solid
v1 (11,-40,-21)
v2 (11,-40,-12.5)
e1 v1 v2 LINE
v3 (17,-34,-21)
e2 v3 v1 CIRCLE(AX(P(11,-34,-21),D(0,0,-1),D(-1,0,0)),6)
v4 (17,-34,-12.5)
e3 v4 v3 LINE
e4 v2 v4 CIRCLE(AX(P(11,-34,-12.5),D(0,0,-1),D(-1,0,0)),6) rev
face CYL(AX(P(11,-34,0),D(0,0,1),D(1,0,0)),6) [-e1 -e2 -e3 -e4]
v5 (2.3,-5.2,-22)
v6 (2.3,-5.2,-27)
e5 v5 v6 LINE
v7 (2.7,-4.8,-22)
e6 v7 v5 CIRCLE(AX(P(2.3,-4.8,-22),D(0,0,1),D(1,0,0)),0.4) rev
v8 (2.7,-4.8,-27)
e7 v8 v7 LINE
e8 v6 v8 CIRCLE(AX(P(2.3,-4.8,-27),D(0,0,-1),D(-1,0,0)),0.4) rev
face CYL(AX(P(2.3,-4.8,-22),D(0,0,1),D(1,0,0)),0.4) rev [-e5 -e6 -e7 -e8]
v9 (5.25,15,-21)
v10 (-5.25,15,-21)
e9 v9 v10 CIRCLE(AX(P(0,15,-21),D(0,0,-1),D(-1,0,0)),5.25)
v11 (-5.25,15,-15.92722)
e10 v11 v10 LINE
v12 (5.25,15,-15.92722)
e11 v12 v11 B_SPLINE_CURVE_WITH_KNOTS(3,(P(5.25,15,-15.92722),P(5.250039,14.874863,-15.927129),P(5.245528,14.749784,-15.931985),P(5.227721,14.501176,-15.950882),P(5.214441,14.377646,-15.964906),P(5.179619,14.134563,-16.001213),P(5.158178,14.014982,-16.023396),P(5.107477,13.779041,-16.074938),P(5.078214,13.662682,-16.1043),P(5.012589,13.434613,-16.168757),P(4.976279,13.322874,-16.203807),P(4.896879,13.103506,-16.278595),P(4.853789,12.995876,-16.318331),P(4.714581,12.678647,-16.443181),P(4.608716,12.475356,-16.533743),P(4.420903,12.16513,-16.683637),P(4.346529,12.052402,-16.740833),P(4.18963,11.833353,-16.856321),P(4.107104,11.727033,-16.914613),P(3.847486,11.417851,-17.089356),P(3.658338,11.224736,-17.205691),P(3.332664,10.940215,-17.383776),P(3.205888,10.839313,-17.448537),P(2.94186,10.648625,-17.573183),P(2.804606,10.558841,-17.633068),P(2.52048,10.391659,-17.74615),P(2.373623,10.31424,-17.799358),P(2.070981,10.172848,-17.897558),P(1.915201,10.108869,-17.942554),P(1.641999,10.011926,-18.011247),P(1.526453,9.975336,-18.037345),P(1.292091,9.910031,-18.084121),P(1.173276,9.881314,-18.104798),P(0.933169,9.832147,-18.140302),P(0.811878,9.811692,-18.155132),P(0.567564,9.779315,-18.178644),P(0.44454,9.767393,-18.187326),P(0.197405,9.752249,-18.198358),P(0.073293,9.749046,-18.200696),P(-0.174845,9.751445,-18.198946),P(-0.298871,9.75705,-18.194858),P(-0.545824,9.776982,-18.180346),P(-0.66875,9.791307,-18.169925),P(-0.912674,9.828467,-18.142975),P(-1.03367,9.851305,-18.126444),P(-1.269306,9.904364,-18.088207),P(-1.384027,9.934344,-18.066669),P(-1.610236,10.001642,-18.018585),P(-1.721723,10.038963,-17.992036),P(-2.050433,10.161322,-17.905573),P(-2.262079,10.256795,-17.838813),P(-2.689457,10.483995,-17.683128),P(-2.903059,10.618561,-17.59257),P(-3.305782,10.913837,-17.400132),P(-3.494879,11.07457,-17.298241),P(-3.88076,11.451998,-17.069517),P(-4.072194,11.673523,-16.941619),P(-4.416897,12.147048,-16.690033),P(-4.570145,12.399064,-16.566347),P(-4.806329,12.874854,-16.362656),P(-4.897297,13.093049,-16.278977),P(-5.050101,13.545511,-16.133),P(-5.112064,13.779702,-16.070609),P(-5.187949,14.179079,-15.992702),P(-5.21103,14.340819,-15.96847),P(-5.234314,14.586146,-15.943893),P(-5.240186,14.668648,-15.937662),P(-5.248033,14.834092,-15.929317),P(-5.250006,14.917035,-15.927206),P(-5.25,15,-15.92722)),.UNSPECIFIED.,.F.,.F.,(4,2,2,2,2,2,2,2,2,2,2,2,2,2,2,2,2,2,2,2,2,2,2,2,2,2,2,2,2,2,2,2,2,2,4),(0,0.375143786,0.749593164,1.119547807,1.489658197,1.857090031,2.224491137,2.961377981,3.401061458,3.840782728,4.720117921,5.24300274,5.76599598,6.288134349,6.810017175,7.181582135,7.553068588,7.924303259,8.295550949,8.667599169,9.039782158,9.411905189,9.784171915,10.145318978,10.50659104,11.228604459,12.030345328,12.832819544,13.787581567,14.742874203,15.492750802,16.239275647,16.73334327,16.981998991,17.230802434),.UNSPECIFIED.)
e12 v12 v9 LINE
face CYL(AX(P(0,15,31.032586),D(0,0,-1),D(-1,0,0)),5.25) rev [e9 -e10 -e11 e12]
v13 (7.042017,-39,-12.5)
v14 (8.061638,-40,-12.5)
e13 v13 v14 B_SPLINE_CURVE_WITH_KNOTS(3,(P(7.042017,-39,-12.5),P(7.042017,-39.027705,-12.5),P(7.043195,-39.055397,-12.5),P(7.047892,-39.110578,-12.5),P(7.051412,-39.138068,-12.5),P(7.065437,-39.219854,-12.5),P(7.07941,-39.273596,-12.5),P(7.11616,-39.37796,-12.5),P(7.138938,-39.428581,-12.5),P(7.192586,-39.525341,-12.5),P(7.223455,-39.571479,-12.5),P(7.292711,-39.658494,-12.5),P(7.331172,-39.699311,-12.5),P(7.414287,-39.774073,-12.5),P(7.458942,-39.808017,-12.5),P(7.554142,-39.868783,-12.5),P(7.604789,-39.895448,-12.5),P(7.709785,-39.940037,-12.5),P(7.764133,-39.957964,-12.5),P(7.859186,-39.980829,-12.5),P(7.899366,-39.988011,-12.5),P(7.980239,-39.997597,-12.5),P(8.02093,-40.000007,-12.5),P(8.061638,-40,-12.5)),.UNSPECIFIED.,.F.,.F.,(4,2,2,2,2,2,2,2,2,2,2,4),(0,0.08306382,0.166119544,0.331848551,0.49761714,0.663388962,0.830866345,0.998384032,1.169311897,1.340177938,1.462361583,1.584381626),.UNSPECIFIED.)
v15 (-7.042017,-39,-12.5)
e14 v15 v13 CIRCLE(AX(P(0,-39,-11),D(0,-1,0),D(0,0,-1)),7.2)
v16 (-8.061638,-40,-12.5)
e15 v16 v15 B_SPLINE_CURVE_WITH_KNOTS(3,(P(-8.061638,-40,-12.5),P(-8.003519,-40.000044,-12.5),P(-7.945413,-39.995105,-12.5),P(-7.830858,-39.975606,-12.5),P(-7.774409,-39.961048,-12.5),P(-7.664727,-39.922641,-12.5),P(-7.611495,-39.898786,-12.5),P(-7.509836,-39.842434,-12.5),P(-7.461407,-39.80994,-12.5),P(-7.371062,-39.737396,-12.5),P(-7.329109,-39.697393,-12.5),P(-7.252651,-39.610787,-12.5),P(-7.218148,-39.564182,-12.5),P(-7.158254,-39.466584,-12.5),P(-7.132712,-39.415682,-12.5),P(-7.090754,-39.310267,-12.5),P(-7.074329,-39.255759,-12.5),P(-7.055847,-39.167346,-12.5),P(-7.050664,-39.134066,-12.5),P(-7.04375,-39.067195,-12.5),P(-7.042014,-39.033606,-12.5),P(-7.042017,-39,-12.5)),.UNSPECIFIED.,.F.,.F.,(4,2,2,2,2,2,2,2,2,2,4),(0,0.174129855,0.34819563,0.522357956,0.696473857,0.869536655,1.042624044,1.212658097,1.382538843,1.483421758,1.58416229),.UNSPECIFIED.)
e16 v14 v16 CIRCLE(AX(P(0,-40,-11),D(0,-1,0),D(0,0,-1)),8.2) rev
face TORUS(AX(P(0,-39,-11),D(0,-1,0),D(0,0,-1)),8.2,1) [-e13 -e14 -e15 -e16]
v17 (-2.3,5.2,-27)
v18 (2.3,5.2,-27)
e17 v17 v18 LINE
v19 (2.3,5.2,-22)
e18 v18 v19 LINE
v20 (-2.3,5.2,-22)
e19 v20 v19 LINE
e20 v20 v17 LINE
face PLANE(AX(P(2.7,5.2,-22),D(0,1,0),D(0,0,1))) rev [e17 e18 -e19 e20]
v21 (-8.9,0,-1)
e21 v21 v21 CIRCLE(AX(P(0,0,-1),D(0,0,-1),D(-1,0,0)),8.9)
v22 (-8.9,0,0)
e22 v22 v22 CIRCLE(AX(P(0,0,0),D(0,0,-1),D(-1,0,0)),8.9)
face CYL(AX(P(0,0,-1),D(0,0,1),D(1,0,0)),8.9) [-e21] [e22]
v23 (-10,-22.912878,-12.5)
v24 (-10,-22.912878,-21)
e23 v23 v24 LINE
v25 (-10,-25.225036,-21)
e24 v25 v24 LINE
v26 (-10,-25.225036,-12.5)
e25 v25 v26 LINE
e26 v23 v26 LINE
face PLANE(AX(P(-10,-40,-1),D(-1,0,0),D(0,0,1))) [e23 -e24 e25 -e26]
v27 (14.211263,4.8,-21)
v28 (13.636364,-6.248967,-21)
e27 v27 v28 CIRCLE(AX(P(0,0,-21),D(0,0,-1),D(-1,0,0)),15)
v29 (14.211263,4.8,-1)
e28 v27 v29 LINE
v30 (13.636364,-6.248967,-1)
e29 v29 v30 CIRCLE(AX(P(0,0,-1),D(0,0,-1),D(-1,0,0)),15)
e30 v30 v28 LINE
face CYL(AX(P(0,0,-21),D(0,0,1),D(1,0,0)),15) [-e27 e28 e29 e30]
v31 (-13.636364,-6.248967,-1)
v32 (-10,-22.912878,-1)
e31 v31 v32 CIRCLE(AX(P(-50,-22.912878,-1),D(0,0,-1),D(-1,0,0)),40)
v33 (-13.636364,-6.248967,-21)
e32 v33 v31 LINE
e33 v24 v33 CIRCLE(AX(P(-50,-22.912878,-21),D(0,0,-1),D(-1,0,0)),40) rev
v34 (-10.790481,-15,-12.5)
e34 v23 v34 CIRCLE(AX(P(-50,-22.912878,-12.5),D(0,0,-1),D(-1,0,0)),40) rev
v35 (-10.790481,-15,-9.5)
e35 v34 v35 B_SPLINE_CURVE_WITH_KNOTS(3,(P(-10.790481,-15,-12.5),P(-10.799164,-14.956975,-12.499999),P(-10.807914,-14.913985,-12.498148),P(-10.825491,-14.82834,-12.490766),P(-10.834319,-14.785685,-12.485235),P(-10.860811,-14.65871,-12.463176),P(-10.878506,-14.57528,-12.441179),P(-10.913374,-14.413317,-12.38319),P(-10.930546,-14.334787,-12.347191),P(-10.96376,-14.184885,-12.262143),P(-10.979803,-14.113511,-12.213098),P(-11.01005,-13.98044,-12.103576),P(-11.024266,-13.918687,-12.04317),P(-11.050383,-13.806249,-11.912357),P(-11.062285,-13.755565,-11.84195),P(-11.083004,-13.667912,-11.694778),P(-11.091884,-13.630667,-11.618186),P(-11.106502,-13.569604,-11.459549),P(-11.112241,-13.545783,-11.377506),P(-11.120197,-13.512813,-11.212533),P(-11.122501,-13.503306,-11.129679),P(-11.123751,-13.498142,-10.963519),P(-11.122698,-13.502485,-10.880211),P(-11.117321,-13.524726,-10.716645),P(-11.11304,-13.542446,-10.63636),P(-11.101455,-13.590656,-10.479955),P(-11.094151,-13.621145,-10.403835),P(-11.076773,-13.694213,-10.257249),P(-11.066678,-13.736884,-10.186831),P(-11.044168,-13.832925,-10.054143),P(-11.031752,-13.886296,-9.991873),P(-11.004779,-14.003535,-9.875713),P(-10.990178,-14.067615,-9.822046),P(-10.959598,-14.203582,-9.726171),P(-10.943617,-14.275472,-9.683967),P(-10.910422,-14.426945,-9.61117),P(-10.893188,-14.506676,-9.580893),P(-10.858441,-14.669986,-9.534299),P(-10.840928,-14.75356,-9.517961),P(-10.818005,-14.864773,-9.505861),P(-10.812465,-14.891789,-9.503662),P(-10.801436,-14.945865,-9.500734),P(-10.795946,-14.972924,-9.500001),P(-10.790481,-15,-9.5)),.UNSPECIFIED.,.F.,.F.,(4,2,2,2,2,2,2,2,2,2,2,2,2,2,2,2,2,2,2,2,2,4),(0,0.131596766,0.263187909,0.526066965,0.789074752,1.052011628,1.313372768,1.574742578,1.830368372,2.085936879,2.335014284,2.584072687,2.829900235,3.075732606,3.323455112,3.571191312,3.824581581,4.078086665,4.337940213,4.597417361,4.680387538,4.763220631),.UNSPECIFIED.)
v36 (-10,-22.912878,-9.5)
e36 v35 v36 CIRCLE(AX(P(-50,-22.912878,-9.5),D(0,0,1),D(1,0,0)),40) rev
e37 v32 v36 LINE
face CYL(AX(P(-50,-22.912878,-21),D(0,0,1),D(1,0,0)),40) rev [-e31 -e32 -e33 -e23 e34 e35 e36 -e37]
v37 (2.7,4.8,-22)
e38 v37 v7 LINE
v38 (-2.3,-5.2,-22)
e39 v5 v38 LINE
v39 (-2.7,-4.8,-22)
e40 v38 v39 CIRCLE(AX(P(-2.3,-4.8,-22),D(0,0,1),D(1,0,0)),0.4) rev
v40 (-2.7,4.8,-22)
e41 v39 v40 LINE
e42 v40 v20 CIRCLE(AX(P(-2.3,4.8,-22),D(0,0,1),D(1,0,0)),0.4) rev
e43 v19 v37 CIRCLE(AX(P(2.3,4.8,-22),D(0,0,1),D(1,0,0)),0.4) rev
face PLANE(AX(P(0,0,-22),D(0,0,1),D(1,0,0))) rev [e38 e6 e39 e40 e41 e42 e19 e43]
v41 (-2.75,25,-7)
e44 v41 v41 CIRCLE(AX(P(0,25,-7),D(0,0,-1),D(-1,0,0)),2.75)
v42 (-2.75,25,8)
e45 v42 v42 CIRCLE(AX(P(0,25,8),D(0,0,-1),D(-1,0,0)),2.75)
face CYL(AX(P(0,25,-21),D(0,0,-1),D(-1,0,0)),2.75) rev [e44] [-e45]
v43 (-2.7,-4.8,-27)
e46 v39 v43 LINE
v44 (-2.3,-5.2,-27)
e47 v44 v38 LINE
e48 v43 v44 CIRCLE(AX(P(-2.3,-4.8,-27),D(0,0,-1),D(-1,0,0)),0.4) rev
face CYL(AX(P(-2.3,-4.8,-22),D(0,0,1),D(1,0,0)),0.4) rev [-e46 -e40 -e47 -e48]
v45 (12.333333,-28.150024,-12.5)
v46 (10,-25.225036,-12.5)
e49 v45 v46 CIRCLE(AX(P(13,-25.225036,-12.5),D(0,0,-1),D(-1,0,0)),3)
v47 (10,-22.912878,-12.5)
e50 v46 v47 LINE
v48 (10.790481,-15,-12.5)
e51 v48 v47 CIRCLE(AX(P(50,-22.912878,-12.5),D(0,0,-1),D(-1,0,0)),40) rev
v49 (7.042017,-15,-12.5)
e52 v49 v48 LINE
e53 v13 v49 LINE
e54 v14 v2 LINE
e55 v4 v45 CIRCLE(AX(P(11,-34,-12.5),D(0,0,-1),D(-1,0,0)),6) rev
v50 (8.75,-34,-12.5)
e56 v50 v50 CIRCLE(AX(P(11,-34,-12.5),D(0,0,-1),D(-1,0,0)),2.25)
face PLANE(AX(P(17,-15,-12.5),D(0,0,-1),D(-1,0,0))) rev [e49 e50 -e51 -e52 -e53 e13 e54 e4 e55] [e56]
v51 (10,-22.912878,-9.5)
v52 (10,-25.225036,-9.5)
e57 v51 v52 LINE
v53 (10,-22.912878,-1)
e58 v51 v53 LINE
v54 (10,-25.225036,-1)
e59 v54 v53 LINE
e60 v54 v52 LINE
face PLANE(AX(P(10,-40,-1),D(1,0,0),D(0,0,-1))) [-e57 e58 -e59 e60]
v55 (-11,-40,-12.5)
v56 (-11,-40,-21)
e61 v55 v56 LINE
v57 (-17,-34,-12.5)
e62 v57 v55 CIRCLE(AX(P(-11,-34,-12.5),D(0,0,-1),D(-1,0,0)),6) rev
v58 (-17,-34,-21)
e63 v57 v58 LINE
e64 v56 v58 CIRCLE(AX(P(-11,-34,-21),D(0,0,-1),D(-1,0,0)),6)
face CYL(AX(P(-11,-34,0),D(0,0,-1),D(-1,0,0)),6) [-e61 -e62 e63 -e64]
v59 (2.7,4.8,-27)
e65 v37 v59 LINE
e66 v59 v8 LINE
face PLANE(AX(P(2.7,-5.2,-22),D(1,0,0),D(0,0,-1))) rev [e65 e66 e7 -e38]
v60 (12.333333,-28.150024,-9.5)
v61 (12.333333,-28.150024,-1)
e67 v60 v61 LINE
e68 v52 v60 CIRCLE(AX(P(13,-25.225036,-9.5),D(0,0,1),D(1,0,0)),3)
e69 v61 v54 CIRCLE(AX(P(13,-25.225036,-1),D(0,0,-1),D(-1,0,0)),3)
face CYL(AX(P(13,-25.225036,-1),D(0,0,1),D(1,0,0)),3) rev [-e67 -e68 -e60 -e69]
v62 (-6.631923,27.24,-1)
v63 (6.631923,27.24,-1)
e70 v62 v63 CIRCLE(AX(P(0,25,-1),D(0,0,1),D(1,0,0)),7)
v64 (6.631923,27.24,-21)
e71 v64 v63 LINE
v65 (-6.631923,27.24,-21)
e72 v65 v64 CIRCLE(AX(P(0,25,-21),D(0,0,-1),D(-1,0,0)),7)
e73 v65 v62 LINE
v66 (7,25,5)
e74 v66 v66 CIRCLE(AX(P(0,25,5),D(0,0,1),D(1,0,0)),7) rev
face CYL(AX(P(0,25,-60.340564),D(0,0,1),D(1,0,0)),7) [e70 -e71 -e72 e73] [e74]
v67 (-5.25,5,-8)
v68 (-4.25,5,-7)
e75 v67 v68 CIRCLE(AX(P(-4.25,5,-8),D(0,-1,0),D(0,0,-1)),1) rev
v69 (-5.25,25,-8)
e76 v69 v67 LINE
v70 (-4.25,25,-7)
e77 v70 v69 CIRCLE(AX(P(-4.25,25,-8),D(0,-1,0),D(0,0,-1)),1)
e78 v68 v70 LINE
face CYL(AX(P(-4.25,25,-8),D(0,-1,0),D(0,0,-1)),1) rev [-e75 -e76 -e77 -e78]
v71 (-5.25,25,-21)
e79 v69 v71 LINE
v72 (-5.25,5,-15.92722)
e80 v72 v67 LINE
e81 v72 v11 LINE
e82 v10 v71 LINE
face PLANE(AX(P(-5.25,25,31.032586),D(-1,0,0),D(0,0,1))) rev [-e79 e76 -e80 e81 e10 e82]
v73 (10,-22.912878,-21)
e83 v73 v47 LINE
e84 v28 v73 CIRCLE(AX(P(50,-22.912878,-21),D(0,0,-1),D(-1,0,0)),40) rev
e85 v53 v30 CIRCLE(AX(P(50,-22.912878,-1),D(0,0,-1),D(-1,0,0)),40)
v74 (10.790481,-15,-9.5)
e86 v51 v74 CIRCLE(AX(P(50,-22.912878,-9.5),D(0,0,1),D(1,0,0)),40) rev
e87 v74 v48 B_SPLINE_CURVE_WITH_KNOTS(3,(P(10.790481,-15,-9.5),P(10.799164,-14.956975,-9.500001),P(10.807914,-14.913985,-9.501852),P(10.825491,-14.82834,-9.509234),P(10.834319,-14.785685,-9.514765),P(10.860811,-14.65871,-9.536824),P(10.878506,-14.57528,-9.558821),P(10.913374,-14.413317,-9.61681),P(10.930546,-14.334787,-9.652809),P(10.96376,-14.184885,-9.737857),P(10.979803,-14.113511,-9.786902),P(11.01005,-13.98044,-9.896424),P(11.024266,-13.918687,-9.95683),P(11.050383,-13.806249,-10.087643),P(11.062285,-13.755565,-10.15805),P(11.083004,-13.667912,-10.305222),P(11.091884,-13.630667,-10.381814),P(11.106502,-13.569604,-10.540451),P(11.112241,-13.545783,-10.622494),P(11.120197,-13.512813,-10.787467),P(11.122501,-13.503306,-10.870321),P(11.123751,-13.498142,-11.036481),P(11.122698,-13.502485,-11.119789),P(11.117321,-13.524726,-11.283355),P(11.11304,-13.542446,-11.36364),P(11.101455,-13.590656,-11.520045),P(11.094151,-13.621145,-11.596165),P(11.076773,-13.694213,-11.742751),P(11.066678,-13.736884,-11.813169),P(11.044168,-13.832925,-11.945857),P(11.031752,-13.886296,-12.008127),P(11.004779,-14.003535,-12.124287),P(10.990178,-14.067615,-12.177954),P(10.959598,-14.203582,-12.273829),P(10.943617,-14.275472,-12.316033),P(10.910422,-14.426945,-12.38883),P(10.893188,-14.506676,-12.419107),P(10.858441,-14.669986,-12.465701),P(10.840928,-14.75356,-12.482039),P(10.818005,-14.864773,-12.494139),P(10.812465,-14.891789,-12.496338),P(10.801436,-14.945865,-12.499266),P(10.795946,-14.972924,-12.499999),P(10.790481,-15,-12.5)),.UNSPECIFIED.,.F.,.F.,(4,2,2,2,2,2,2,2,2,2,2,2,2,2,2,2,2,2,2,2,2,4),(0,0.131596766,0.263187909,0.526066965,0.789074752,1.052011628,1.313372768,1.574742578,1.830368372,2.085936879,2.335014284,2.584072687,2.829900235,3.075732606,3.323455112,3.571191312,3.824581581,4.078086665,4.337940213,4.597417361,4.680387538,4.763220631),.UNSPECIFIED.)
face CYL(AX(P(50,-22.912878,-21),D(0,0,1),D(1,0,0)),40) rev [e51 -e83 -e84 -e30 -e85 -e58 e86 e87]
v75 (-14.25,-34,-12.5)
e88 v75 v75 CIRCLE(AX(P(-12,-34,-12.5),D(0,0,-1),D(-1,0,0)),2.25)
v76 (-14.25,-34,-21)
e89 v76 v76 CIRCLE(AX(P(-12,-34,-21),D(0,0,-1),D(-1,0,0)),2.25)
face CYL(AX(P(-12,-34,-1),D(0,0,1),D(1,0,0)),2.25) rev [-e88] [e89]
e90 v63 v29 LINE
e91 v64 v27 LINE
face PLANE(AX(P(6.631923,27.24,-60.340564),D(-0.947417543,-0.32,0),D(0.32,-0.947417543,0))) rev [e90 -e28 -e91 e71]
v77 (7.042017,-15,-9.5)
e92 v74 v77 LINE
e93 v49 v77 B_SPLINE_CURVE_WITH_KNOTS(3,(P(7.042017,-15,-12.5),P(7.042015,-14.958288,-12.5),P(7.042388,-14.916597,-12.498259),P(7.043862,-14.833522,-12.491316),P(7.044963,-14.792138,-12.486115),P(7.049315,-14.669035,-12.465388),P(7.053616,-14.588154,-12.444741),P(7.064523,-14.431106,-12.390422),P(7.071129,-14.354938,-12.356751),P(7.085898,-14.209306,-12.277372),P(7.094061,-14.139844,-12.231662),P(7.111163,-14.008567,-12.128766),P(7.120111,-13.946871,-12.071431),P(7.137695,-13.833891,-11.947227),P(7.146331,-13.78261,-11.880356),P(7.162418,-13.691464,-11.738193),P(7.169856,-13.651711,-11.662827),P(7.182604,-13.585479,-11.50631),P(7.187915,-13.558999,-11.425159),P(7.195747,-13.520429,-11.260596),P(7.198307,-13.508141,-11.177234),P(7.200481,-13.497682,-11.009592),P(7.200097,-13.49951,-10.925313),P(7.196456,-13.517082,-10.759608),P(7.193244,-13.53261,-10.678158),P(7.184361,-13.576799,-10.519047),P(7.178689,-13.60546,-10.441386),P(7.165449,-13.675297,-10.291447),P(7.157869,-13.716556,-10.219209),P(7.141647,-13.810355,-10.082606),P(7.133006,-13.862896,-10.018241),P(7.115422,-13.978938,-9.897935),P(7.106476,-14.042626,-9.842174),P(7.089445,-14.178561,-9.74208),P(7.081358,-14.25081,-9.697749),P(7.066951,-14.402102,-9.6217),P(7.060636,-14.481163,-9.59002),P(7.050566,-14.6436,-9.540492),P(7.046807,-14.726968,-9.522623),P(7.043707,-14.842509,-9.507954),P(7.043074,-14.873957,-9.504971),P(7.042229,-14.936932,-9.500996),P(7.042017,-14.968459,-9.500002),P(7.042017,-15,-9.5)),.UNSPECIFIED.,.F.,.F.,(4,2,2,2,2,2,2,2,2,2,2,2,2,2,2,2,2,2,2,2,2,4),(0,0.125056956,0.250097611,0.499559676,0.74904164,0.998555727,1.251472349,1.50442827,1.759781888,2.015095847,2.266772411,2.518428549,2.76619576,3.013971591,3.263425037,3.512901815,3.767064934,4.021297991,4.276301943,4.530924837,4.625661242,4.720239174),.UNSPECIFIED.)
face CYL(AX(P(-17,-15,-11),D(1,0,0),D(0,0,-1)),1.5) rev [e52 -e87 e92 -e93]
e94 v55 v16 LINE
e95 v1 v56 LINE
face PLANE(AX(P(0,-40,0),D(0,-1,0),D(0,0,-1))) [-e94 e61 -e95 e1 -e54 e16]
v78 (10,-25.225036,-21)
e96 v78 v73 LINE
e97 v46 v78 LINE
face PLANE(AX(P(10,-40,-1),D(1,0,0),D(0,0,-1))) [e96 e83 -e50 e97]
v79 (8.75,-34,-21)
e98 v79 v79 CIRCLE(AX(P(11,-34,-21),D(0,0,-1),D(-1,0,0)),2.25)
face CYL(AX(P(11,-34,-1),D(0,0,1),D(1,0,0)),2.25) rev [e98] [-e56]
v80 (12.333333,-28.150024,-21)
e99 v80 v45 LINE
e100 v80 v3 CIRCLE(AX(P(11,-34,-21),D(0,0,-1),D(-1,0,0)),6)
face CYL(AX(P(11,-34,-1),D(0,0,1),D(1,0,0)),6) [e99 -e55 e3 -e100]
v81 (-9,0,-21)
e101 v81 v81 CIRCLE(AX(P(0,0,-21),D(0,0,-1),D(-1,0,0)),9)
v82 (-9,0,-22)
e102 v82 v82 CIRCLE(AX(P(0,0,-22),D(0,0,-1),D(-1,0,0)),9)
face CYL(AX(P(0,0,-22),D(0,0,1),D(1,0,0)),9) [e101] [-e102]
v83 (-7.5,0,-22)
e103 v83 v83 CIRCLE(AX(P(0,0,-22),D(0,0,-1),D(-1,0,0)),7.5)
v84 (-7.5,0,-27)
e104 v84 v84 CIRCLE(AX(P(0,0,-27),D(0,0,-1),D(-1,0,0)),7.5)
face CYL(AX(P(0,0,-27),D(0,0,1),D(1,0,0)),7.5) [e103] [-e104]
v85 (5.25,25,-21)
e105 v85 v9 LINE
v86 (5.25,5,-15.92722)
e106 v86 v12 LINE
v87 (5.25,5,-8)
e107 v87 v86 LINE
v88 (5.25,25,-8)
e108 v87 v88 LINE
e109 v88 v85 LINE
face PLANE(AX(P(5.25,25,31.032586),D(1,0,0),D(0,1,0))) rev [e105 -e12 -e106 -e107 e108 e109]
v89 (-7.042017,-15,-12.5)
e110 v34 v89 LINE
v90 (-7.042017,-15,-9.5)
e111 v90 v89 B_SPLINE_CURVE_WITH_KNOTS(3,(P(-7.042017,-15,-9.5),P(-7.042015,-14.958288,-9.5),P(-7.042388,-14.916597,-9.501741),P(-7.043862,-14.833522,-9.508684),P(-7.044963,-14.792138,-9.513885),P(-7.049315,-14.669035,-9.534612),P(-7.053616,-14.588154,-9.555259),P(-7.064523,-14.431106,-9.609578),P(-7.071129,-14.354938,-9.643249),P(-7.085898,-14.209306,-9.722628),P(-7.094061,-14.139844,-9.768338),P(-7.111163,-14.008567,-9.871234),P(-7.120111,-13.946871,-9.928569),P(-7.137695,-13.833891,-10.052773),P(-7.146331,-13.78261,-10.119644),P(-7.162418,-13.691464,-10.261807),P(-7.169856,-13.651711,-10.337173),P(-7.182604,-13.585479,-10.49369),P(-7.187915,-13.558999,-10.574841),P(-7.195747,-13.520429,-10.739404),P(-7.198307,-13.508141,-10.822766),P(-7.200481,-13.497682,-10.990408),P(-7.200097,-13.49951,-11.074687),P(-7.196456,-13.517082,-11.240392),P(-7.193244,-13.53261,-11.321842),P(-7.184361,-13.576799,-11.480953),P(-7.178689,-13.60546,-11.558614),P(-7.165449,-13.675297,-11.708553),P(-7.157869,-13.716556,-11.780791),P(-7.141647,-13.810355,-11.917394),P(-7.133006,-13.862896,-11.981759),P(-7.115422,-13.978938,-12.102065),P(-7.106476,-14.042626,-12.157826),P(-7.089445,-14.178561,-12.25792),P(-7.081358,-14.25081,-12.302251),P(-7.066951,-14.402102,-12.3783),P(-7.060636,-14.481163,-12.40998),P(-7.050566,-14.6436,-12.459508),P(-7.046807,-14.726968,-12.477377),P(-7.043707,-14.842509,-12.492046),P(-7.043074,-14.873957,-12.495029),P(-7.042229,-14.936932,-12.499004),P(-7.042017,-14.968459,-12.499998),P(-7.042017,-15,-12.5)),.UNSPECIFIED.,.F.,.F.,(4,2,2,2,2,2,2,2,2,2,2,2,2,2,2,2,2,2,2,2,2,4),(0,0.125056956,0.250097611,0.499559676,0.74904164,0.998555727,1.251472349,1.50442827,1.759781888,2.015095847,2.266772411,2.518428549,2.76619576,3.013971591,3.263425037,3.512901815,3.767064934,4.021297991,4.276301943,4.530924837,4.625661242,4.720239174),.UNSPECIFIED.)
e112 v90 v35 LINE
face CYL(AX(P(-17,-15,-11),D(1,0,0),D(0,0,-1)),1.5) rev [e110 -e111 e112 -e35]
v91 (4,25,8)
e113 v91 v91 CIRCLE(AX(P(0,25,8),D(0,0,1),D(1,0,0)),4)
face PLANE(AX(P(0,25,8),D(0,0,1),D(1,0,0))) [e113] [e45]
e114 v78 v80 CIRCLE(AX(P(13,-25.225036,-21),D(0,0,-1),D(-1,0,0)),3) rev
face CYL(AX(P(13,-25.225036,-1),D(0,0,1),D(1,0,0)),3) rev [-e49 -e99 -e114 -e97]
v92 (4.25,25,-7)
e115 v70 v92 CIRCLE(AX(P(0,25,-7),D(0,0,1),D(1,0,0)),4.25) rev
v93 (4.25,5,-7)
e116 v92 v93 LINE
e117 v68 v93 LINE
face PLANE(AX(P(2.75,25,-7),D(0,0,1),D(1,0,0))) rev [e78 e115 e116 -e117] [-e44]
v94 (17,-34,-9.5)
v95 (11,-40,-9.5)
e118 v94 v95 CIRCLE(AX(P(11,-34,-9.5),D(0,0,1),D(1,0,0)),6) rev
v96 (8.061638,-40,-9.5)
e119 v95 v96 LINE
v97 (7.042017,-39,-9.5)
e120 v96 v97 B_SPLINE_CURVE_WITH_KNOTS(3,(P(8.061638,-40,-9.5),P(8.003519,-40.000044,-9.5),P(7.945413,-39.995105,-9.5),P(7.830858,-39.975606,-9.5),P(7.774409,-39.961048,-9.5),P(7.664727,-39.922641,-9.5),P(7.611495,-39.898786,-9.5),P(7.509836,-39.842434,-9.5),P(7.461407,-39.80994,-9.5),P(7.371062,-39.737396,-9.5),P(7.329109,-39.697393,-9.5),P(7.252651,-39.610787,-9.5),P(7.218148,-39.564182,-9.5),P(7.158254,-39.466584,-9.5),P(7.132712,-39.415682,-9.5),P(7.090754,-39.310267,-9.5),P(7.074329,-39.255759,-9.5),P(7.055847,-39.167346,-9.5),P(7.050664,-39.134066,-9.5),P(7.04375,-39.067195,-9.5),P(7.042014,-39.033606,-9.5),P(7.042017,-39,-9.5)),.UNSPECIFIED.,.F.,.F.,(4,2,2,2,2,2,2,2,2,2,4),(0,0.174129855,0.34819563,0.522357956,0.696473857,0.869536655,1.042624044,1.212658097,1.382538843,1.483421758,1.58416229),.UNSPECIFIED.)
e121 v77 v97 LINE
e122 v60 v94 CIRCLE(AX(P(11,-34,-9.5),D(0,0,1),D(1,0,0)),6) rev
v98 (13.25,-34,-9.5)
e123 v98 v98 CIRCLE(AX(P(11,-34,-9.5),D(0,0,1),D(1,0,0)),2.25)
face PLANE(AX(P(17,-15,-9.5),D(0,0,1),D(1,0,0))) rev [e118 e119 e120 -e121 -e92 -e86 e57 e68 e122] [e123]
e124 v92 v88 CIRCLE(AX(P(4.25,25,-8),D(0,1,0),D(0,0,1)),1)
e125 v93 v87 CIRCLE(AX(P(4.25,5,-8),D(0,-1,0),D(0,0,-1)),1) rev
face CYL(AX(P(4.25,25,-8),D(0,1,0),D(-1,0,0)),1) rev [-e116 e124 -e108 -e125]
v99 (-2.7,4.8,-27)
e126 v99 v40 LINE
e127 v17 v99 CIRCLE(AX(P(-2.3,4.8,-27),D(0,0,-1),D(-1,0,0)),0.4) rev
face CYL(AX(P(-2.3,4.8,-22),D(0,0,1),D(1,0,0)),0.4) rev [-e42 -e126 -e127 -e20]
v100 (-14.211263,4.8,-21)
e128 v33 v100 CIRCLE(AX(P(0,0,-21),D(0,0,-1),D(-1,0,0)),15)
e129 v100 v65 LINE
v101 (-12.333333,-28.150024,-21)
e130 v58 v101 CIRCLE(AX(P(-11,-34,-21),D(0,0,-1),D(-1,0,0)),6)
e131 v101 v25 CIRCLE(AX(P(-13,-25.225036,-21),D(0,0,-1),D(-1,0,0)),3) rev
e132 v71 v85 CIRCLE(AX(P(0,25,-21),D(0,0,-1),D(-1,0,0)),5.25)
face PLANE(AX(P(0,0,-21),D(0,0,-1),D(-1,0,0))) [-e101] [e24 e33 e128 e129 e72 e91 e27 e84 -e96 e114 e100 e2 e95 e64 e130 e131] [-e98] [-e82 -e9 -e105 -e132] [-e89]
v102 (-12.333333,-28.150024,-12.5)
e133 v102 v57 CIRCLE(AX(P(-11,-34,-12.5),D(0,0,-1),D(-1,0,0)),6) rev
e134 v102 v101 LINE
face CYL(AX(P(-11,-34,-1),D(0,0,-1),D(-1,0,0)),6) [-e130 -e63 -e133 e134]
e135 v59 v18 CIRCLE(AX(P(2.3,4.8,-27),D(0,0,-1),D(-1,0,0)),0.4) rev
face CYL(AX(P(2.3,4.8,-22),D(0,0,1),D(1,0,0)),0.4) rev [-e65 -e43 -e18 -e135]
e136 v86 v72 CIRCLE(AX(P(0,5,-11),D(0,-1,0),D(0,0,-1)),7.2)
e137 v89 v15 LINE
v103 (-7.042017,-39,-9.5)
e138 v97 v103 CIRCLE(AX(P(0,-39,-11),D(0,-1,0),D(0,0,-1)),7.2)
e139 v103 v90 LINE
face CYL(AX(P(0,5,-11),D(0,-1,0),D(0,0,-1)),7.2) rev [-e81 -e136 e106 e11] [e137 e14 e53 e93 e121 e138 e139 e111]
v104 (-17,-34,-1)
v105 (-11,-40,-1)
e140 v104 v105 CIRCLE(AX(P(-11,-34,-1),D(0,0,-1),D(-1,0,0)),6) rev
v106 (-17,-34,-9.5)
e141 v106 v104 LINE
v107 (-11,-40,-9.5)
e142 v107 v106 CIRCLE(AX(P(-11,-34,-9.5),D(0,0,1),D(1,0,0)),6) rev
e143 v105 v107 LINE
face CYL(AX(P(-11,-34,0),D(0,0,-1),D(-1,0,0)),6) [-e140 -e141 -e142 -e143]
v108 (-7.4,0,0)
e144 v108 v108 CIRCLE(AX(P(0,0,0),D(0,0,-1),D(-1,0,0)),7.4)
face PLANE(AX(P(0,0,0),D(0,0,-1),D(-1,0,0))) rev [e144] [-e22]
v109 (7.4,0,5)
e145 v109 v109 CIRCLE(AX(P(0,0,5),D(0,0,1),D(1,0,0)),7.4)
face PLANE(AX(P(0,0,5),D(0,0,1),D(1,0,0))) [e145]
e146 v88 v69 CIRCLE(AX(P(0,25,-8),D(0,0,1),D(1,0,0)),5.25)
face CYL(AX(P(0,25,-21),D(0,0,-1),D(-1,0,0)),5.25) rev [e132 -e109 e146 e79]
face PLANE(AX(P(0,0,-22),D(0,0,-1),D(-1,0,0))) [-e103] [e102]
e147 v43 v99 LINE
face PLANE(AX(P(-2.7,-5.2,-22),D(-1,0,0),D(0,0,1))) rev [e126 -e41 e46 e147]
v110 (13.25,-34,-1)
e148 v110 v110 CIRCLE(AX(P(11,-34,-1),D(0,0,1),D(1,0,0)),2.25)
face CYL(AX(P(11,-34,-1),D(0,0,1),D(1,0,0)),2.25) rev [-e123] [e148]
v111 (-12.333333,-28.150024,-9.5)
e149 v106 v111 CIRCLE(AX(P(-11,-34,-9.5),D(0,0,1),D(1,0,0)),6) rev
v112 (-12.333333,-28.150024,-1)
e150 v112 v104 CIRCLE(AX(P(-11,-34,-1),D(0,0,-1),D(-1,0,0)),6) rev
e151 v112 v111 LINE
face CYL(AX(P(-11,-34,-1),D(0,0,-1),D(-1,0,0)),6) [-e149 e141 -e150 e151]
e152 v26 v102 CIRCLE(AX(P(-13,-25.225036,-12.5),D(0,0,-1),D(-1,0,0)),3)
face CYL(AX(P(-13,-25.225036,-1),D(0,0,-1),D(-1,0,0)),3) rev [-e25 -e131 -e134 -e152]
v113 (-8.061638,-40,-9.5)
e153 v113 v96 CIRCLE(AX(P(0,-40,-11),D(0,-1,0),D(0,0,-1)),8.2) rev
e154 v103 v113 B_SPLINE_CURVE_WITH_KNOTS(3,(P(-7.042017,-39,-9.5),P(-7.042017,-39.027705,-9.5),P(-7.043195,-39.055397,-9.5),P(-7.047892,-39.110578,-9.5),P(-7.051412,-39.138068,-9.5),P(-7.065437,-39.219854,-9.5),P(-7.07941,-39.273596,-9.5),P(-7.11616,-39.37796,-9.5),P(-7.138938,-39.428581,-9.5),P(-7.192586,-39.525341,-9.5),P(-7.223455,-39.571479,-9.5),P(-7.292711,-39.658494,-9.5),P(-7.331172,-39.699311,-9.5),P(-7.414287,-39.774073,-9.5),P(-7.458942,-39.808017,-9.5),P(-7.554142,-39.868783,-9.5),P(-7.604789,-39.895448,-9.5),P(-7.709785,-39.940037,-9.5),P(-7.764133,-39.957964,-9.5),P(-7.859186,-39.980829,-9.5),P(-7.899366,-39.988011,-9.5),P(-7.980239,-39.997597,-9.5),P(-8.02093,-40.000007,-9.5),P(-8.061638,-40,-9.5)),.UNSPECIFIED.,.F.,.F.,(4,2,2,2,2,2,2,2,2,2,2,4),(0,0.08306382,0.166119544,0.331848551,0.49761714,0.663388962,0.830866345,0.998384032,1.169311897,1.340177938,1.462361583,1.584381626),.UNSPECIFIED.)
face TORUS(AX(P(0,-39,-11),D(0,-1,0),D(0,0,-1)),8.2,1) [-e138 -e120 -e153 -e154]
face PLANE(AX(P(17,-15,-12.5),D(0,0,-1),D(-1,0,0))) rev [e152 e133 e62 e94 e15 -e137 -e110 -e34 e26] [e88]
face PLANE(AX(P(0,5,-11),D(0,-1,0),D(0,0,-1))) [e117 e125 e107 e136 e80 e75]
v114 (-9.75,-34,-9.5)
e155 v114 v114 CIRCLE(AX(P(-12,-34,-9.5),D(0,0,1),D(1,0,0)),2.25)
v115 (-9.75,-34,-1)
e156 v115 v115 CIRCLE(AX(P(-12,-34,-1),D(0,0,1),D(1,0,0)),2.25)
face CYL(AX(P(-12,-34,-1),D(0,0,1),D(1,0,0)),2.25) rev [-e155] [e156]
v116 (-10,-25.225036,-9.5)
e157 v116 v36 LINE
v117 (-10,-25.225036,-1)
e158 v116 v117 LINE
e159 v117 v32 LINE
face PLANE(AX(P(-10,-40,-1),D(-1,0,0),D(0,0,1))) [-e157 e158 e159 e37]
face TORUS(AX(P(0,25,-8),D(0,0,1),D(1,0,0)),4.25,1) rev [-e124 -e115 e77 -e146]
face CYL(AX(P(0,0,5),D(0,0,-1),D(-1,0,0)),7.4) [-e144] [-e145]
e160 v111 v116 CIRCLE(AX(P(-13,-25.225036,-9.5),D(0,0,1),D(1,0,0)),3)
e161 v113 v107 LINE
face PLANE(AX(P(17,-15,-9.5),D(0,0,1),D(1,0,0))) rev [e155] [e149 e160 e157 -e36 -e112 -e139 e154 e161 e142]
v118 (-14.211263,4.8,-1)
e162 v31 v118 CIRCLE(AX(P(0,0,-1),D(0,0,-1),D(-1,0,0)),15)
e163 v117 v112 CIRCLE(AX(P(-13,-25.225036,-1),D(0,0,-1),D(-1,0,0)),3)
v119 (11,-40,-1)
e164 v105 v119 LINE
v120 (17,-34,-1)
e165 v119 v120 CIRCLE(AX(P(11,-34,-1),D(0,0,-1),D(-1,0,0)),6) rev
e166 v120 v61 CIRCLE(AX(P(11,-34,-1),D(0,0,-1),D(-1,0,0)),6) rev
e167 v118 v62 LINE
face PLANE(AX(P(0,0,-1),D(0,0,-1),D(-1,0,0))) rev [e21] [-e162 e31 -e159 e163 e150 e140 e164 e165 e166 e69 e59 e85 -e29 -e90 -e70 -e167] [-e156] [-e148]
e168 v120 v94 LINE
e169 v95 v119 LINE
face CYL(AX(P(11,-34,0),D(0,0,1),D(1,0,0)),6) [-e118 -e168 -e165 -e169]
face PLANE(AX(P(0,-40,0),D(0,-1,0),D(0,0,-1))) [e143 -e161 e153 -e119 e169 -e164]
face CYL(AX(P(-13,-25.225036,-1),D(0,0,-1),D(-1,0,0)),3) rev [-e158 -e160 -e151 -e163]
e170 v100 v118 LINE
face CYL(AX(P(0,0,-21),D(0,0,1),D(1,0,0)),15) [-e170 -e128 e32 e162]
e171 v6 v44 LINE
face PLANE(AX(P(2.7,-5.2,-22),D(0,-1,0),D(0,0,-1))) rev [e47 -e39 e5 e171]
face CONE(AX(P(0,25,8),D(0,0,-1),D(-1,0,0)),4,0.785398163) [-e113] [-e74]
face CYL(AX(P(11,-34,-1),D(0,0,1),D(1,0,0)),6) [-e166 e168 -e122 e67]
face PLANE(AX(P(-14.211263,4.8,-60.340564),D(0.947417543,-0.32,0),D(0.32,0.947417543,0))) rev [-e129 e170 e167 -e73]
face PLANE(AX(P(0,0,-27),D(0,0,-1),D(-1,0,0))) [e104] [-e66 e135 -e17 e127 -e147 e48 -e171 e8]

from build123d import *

# Parameters (mm, degrees)
SKETCH_1_R                  = 7.4
EXTRUDE_1_DEPTH             = 5
SKETCH_2_R                  = 8.9
EXTRUDE_2_DEPTH             = 1
SKETCH_3_R                  = 15
EXTRUDE_3_DEPTH             = 20
SKETCH_11_W                 = 20
SKETCH_11_H                 = 20
EXTRUDE_8_DEPTH             = 40
EXTRUDE_4_DEPTH             = 20
EXTRUDE_START               = 9
SKETCH_5_R                  = 7
EXTRUDE_5_DEPTH             = 9
HOLE_WIZARD_M51_D           = 5.5
HOLE_WIZARD_M51_CBORE_D     = 10.5
HOLE_WIZARD_M51_CBORE_DEPTH = 14
CHAMFER_1_SIZE              = 3
FILLET_20_R                 = 40
SKETCH_8_R                  = 9
EXTRUDE_6_DEPTH             = 1
SKETCH_9_R                  = 7.5
EXTRUDE_7_DEPTH             = 5
SKETCH_13_W                 = 34
SKETCH_13_H                 = 20
EXTRUDE_9_DEPTH             = 12
SKETCH_14_R                 = 7.2
CUT_EXTRUDE_3_DEPTH         = 45
SKETCH_15_W                 = 34
SKETCH_15_H                 = 3
CUT_EXTRUDE_4_DEPTH         = 25
CUT_EXTRUDE_5_DEPTH         = 52.166395
CUT_EXTRUDE_5_DEPTH_BACK    = 52.166395
FILLET_14_R                 = 1
CUT_EXTRUDE_6_DEPTH         = 14
CUT_EXTRUDE_7_DEPTH         = 64.584589
SKETCH_19_W                 = 5.4
SKETCH_19_H                 = 10.4
CUT_EXTRUDE_8_DEPTH         = 5
FILLET_15_R                 = 1
FILLET_18_R                 = 0.4
HOLE_WIZARD_M41_D           = 4.5
FILLET_19_R                 = 6
FILLET_21_R                 = 3


with BuildPart() as part:
    # Эскиз1 → Бобышка-Вытянуть1 (new body)
    with BuildSketch(Plane.XY):
        Circle(SKETCH_1_R)
    extrude(amount=EXTRUDE_1_DEPTH)

    # Эскиз2 → Бобышка-Вытянуть2 (add)
    with BuildSketch(Plane(origin=(0, 0, 0), x_dir=(-1, 0, 0), z_dir=(0, 0, -1))):
        Circle(SKETCH_2_R)
    extrude(amount=EXTRUDE_2_DEPTH)

    # Эскиз3 → Бобышка-Вытянуть3 (add)
    with BuildSketch(Plane(origin=(0, 0, -1), x_dir=(-1, 0, 0), z_dir=(0, 0, -1))):
        Circle(SKETCH_3_R)
    extrude(amount=EXTRUDE_3_DEPTH)

    # Эскиз11 → Бобышка-Вытянуть8 (add)
    with BuildSketch(Plane(origin=(0, 0, 0), x_dir=(1, 0, 0), z_dir=(0, 1, 0))):
        with Locations((0, 11)):
            Rectangle(SKETCH_11_W, SKETCH_11_H)
    extrude(amount=-EXTRUDE_8_DEPTH)

    # Эскиз4 → Бобышка-Вытянуть4 (add)
    with BuildSketch(Plane(origin=(0, 0, -1), x_dir=(-1, 0, 0), z_dir=(0, 0, -1))):
        with BuildLine():
            Line((-6.631923, 27.24), (-14.211263, 4.8))
            Line((-14.211263, 4.8), (14.211263, 4.8))
            Line((14.211263, 4.8), (6.631923, 27.24))
            ThreePointArc((6.631923, 27.24), (0, 32), (-6.631923, 27.24))
        make_face()
    extrude(amount=EXTRUDE_4_DEPTH)

    # Эскиз5 → Бобышка-Вытянуть5 (add)
    with BuildSketch(Plane.XY.offset(-1).offset(EXTRUDE_START)):
        with Locations((0, 25)):
            Circle(SKETCH_5_R)
    extrude(amount=-EXTRUDE_5_DEPTH)

    # Цековка для винта с внутренним шестигранником M51 (through all)
    with Locations(Plane(origin=(0.481722, 0.624121, -21), x_dir=(-1, 0, 0), z_dir=(0, 0, -1))):
        with Locations((0.481722, 24.375879)):
            CounterBoreHole(HOLE_WIZARD_M51_D / 2, HOLE_WIZARD_M51_CBORE_D / 2, HOLE_WIZARD_M51_CBORE_DEPTH)

    # Фаска1
    chamfer_1_edges = [part.edges().sort_by_distance(p)[0] for p in [
        (-7, 25, 8),
    ]]
    chamfer(chamfer_1_edges, length=CHAMFER_1_SIZE)

    # Скругление20
    fillet_20_edges = [part.edges().sort_by_distance(p)[0] for p in [
        (10, -11.18034, -11),
        (-10, -11.18034, -11),
    ]]
    fillet(fillet_20_edges, radius=FILLET_20_R)

    # Эскиз8 → Бобышка-Вытянуть6 (add)
    with BuildSketch(Plane(origin=(0, 0, -21), x_dir=(-1, 0, 0), z_dir=(0, 0, -1))):
        Circle(SKETCH_8_R)
    extrude(amount=EXTRUDE_6_DEPTH)

    # Эскиз9 → Бобышка-Вытянуть7 (add)
    with BuildSketch(Plane(origin=(0, 0, -22), x_dir=(-1, 0, 0), z_dir=(0, 0, -1))):
        Circle(SKETCH_9_R)
    extrude(amount=EXTRUDE_7_DEPTH)

    # Эскиз13 → Бобышка-Вытянуть9 (add)
    with BuildSketch(Plane(origin=(0, -40, 0), x_dir=(-1, 0, 0), z_dir=(0, -1, 0))):
        with Locations((0, 11)):
            Rectangle(SKETCH_13_W, SKETCH_13_H)
    extrude(amount=-EXTRUDE_9_DEPTH)

    # Эскиз14 → Вырез-Вытянуть3 (cut)
    with BuildSketch(Plane(origin=(0, -40, 0), x_dir=(-1, 0, 0), z_dir=(0, -1, 0))):
        with Locations(Location((0, 11, 0), (0, 0, 90))):
            Circle(SKETCH_14_R)
    extrude(amount=-CUT_EXTRUDE_3_DEPTH, mode=Mode.SUBTRACT)

    # Эскиз15 → Вырез-Вытянуть4 (cut)
    with BuildSketch(Plane(origin=(0, -40, 0), x_dir=(-1, 0, 0), z_dir=(0, -1, 0))):
        with Locations((0, 11)):
            Rectangle(SKETCH_15_W, SKETCH_15_H)
    extrude(amount=-CUT_EXTRUDE_4_DEPTH, mode=Mode.SUBTRACT)

    # Эскиз16 → Вырез-Вытянуть5 (cut, two sides: drawn at the far end of the back side and taken through both)
    with BuildSketch(Plane(origin=(0, 0, 0), x_dir=(0, 0, -1), z_dir=(1, 0, 0)).offset(-CUT_EXTRUDE_5_DEPTH_BACK)):
        with BuildLine():
            Line((9.5, -15), (12.5, -15))
            ThreePointArc((12.5, -15), (11, -13.5), (9.5, -15))
        make_face()
    extrude(amount=CUT_EXTRUDE_5_DEPTH + CUT_EXTRUDE_5_DEPTH_BACK, mode=Mode.SUBTRACT)

    # Скругление14
    fillet_14_edges = [part.edges().sort_by_distance(p)[0] for p in [
        (0, -40, -3.8),
        (-4.529901, -40, -16.596427),
    ]]
    fillet(fillet_14_edges, radius=FILLET_14_R)

    # Эскиз17 → Вырез-Вытянуть6 (cut)
    with BuildSketch(Plane(origin=(0, 0, -21), x_dir=(-1, 0, 0), z_dir=(0, 0, -1))):
        with BuildLine():
            Line((5.25, 25), (5.25, 15))
            ThreePointArc((5.25, 15), (0, 9.75), (-5.25, 15))
            Line((-5.25, 15), (-5.25, 25))
            ThreePointArc((-5.25, 25), (0, 30.25), (5.25, 25))
        make_face()
    extrude(amount=-CUT_EXTRUDE_6_DEPTH, mode=Mode.SUBTRACT)

    # Эскиз18 → Вырез-Вытянуть7 (cut, through all)
    with BuildSketch(Plane(origin=(0, 15, 0), x_dir=(-1, 0, 0), z_dir=(0, -1, 0))):
        with BuildLine():
            Line((-5.25, 7), (5.25, 7))
            Line((5.25, 7), (5.25, 15.92722))
            ThreePointArc((5.25, 15.92722), (0, 18.2), (-5.25, 15.92722))
            Line((-5.25, 15.92722), (-5.25, 7))
        make_face()
    extrude(amount=CUT_EXTRUDE_7_DEPTH, mode=Mode.SUBTRACT)

    # Эскиз19 → Вырез-Вытянуть8 (cut)
    with BuildSketch(Plane(origin=(0, 0, -27), x_dir=(-1, 0, 0), z_dir=(0, 0, -1))):
        Rectangle(SKETCH_19_W, SKETCH_19_H)
    extrude(amount=-CUT_EXTRUDE_8_DEPTH, mode=Mode.SUBTRACT)

    # Скругление15
    fillet_15_edges = [part.edges().sort_by_distance(p)[0] for p in [
        (5.25, 10, -7),
        (-5.25, 10, -7),
        (0, 30.25, -7),
    ]]
    fillet(fillet_15_edges, radius=FILLET_15_R)

    # Скругление18
    fillet_18_edges = [part.edges().sort_by_distance(p)[0] for p in [
        (-2.7, 5.2, -24.5),
        (-2.7, -5.2, -24.5),
        (2.7, -5.2, -24.5),
        (2.7, 5.2, -24.5),
    ]]
    fillet(fillet_18_edges, radius=FILLET_18_R)

    # Отверстие с зазором M41 (through all)
    with Locations(Plane.XY.offset(-1)):
        with Locations((-12, -34), (11, -34)):
            Hole(HOLE_WIZARD_M41_D / 2)

    # Скругление19
    fillet_19_edges = [part.edges().sort_by_distance(p)[0] for p in [
        (17, -28, -16.75),
        (17, -28, -5.25),
        (17, -40, -5.25),
        (17, -40, -16.75),
        (-17, -28, -16.75),
        (-17, -40, -16.75),
        (-17, -28, -5.25),
        (-17, -40, -5.25),
    ]]
    fillet(fillet_19_edges, radius=FILLET_19_R - 0.0001)  # a hair under: the kernel refuses the full size

    # Скругление21
    fillet_21_edges = [part.edges().sort_by_distance(p)[0] for p in [
        (10, -28, -16.75),
        (10, -28, -5.25),
        (-10, -28, -16.75),
        (-10, -28, -5.25),
    ]]
    fillet(fillet_21_edges, radius=FILLET_21_R)


solid = part.part
